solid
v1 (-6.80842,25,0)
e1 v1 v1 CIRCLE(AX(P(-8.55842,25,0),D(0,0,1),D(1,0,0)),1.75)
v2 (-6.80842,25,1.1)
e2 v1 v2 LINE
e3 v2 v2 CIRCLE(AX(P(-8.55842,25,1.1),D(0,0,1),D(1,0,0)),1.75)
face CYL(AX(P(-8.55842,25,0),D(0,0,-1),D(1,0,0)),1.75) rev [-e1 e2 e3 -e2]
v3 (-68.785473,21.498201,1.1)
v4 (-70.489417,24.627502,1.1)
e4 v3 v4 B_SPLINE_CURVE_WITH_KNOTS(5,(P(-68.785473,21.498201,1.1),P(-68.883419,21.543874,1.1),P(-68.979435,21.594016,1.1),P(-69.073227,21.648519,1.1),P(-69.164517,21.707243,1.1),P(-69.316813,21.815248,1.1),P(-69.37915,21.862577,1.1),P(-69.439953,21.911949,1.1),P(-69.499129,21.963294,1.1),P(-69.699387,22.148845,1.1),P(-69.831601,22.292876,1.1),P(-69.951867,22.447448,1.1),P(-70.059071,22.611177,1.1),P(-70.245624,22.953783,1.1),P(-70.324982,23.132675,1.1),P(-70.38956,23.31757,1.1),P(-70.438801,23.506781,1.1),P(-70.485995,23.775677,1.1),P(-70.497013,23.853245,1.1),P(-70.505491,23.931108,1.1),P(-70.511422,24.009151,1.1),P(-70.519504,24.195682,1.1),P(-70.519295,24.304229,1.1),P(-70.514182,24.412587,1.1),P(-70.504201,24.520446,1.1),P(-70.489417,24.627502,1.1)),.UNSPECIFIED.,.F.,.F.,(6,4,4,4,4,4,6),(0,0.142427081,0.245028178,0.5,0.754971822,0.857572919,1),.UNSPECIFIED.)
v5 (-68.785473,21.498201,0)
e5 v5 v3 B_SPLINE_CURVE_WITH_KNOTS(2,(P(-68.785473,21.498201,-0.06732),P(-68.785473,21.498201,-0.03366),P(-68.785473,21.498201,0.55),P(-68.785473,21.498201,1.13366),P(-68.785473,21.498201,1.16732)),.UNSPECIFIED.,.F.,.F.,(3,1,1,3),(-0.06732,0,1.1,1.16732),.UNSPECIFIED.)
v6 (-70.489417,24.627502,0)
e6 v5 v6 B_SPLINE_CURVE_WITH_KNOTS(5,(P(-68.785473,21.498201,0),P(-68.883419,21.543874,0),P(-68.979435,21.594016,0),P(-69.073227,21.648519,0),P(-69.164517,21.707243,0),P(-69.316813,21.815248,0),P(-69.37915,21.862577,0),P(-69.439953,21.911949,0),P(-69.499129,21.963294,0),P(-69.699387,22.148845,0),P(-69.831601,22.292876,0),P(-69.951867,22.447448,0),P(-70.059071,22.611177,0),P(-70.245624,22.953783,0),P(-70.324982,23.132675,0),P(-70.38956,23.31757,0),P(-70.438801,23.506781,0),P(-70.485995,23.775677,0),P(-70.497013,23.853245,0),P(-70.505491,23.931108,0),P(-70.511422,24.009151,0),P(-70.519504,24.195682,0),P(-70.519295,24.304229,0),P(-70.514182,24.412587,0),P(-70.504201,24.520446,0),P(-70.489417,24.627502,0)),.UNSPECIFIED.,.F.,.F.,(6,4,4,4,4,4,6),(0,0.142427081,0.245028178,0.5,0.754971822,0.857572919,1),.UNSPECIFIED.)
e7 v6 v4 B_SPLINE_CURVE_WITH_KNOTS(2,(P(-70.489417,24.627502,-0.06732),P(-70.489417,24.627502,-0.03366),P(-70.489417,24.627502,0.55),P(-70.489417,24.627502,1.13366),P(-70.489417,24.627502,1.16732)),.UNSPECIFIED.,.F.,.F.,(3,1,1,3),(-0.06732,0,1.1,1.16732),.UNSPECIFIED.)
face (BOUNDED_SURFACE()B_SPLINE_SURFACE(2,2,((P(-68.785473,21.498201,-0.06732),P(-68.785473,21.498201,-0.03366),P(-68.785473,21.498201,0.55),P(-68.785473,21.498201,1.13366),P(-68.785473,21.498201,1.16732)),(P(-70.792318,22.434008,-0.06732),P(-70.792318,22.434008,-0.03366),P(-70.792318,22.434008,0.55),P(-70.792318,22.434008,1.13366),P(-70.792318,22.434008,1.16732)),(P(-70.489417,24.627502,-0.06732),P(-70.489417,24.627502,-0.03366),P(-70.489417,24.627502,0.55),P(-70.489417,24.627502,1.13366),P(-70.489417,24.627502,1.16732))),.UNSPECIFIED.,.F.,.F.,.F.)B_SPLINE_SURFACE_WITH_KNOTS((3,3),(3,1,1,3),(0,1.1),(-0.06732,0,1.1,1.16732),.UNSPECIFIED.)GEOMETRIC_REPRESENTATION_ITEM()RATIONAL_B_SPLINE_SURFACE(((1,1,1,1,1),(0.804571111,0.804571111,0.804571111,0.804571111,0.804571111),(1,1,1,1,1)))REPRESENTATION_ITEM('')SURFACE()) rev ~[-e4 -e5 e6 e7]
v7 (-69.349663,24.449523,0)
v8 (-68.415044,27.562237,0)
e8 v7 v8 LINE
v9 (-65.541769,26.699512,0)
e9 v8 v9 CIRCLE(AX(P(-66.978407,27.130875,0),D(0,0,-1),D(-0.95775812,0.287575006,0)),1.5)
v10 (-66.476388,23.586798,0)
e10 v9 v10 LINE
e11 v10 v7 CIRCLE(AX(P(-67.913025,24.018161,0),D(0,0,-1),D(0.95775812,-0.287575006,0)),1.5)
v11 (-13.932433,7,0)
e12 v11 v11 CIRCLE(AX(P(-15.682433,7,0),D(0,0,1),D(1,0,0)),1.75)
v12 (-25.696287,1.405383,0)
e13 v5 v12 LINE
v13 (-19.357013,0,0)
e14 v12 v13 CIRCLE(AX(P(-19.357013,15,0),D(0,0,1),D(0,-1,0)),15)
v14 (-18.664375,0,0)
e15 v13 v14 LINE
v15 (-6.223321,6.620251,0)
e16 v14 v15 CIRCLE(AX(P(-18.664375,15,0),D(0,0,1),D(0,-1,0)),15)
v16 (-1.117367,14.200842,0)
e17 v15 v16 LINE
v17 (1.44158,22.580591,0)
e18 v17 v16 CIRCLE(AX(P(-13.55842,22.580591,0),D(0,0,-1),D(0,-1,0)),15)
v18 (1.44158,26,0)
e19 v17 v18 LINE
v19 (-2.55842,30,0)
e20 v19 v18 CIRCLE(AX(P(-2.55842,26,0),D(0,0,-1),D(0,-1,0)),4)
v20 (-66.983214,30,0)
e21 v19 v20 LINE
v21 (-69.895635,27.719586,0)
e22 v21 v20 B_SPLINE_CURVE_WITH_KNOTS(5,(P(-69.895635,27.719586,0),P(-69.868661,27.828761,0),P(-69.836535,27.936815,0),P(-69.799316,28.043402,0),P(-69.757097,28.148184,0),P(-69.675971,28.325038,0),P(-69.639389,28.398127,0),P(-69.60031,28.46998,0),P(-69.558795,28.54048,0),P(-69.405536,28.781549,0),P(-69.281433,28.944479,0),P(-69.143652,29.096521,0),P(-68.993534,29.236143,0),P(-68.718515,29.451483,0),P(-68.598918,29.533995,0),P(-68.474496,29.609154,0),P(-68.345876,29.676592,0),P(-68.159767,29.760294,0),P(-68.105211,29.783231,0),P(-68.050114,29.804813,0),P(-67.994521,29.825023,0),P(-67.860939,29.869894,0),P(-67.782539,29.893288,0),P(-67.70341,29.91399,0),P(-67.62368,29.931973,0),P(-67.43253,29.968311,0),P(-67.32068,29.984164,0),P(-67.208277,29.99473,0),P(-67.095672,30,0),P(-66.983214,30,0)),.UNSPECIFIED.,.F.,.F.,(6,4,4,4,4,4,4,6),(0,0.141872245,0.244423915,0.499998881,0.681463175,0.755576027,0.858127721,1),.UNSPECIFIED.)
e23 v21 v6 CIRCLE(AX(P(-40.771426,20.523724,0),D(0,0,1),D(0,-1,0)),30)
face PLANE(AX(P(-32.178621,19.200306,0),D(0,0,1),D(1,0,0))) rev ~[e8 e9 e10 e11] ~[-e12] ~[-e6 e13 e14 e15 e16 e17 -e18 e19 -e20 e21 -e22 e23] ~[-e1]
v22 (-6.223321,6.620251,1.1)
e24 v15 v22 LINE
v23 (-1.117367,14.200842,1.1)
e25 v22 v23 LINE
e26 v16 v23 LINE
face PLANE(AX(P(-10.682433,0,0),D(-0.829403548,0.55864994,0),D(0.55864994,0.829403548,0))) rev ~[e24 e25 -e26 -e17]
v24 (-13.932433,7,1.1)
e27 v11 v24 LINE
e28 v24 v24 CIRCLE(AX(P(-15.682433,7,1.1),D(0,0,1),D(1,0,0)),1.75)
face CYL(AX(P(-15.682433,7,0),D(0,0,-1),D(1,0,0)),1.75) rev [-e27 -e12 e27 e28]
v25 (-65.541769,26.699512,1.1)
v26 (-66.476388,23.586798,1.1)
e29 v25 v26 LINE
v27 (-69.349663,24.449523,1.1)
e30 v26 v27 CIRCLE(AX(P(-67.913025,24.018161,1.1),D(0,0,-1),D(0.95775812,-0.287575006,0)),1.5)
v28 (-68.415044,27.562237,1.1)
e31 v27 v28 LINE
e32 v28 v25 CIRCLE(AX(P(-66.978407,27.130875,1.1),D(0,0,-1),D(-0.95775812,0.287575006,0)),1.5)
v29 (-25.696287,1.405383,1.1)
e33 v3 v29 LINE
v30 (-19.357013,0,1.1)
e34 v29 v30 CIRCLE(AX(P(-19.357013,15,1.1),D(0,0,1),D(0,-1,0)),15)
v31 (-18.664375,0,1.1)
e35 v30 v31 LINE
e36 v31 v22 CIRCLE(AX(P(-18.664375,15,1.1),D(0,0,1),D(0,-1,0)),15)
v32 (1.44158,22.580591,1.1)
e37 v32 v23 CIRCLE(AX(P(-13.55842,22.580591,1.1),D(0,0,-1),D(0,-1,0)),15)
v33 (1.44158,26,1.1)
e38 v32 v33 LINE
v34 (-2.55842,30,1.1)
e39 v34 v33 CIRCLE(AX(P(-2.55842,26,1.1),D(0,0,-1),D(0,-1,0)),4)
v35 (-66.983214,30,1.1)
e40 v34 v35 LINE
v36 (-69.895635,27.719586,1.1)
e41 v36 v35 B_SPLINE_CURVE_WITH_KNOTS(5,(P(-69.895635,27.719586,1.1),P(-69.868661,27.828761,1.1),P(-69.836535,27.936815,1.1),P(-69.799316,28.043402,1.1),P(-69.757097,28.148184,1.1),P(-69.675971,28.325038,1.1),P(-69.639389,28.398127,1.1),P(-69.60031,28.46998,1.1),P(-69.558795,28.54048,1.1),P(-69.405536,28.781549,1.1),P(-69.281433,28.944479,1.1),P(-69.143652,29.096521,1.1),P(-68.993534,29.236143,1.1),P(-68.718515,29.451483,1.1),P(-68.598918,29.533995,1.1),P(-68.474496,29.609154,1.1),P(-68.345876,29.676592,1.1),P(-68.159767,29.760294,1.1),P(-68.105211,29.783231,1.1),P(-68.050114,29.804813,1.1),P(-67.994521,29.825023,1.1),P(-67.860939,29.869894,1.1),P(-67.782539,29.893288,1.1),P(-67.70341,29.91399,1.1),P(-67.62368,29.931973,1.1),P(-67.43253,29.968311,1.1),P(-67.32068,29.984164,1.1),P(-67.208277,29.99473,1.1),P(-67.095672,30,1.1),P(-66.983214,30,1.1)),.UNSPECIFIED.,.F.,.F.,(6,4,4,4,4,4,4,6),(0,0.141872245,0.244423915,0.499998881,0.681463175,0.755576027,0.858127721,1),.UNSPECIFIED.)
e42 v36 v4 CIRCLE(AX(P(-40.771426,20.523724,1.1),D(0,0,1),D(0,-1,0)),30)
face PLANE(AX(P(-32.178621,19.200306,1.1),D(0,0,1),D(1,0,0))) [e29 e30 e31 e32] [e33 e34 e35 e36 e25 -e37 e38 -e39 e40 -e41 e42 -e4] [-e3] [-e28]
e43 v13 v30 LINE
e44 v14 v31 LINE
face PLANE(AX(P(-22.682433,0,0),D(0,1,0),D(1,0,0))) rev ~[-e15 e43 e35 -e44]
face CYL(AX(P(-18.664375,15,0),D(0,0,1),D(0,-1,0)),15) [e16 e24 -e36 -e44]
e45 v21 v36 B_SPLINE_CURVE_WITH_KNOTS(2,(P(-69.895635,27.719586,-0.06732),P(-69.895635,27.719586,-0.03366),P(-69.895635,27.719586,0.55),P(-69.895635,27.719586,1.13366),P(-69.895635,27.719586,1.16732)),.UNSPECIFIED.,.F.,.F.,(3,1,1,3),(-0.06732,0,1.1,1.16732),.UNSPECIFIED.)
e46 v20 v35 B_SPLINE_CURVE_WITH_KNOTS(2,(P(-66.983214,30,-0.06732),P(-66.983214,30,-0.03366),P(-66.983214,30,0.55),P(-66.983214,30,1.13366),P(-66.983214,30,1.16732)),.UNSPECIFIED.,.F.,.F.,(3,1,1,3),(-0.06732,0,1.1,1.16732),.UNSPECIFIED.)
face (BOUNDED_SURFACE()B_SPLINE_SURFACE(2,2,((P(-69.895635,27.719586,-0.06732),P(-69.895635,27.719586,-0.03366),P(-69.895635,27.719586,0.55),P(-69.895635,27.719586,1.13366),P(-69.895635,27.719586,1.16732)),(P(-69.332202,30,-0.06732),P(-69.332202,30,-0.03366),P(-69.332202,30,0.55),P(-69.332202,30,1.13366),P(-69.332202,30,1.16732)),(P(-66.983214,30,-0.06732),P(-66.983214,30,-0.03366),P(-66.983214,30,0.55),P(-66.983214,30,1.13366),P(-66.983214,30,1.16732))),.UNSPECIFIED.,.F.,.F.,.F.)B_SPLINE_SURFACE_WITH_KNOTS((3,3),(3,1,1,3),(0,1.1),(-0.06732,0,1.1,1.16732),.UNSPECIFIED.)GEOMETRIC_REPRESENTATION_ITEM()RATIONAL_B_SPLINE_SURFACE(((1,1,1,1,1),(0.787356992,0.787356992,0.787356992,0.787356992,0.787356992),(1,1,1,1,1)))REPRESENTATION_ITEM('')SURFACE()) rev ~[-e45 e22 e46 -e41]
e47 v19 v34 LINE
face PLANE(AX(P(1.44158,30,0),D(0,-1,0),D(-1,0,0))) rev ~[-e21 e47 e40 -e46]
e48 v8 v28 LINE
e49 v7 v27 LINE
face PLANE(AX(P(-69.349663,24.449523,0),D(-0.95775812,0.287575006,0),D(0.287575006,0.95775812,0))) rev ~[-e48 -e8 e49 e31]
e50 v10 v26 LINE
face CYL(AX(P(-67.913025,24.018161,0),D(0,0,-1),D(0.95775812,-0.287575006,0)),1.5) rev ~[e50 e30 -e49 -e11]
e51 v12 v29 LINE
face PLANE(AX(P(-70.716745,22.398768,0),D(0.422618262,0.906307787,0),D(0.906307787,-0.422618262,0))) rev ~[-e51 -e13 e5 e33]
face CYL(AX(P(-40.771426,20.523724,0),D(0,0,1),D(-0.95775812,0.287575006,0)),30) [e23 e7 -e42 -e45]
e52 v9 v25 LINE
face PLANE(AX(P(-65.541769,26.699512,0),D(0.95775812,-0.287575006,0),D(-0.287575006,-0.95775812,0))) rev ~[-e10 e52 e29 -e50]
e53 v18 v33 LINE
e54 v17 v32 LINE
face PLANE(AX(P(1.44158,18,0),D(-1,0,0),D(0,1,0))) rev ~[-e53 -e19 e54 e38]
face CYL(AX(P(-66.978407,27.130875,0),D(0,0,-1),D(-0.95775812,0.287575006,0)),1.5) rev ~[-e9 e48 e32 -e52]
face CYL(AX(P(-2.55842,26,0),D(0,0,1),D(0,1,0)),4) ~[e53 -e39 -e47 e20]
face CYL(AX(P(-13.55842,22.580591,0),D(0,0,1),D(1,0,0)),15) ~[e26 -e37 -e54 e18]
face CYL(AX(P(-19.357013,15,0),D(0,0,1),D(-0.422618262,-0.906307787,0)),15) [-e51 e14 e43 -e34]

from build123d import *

# Parameters (mm, degrees)
F0_R     = 1.75
F1_DEPTH = 1.1
F2_R     = 4
F3_R     = 30
F4_R     = 15
F5_R     = 3


with BuildPart() as f1:
    # F0 (on Top) → F1 (new body)
    with BuildSketch(Plane.XY):
        Polygon((-70.716745456, 22.3987678723), (-22.682432743, 0), (-10.682432743, 0), (1.4415796787, 18), (1.4415796787, 30), (-69.2492423021, 30), (-70.4260300789, 26.0807510217), align=None)
        with Locations((-15.682432743, 7)):
            Circle(F0_R, mode=Mode.SUBTRACT)
        with BuildLine():
            Line((-69.3496626194, 24.449523286), (-68.4150438499, 27.5622371752))
            ThreePointArc((-68.4150438499, 27.5622371752), (-66.5470441613, 28.5675118458), (-65.5417694907, 26.6995121572))
            Line((-65.5417694907, 26.6995121572), (-66.4763882602, 23.586798268))
            ThreePointArc((-66.4763882602, 23.586798268), (-68.3443879488, 22.5815235974), (-69.3496626194, 24.449523286))
        make_face(mode=Mode.SUBTRACT)
        with Locations((-8.5584203213, 24.9999999582)):
            Circle(F0_R, mode=Mode.SUBTRACT)
    extrude(amount=F1_DEPTH)

    # F2
    f2_edges = [f1.edges().sort_by_distance(p)[0] for p in [
        (1.44158, 30, 0.55),
    ]]
    fillet(f2_edges, radius=F2_R)

    # F3
    f3_edges = [f1.edges().sort_by_distance(p)[0] for p in [
        (-70.42603, 26.080751, 0.55),
    ]]
    fillet(f3_edges, radius=F3_R)

    # F4
    f4_edges = [f1.edges().sort_by_distance(p)[0] for p in [
        (-22.682433, 0, 0.55),
        (1.44158, 18, 0.55),
        (-10.682433, 0, 0.55),
    ]]
    fillet(f4_edges, radius=F4_R)

    # F5
    f5_edges = [f1.edges().sort_by_distance(p)[0] for p in [
        (-69.249242, 30, 0.55),
        (-70.716745, 22.398768, 0.55),
    ]]
    fillet(f5_edges, radius=F5_R)


solid = f1.part
